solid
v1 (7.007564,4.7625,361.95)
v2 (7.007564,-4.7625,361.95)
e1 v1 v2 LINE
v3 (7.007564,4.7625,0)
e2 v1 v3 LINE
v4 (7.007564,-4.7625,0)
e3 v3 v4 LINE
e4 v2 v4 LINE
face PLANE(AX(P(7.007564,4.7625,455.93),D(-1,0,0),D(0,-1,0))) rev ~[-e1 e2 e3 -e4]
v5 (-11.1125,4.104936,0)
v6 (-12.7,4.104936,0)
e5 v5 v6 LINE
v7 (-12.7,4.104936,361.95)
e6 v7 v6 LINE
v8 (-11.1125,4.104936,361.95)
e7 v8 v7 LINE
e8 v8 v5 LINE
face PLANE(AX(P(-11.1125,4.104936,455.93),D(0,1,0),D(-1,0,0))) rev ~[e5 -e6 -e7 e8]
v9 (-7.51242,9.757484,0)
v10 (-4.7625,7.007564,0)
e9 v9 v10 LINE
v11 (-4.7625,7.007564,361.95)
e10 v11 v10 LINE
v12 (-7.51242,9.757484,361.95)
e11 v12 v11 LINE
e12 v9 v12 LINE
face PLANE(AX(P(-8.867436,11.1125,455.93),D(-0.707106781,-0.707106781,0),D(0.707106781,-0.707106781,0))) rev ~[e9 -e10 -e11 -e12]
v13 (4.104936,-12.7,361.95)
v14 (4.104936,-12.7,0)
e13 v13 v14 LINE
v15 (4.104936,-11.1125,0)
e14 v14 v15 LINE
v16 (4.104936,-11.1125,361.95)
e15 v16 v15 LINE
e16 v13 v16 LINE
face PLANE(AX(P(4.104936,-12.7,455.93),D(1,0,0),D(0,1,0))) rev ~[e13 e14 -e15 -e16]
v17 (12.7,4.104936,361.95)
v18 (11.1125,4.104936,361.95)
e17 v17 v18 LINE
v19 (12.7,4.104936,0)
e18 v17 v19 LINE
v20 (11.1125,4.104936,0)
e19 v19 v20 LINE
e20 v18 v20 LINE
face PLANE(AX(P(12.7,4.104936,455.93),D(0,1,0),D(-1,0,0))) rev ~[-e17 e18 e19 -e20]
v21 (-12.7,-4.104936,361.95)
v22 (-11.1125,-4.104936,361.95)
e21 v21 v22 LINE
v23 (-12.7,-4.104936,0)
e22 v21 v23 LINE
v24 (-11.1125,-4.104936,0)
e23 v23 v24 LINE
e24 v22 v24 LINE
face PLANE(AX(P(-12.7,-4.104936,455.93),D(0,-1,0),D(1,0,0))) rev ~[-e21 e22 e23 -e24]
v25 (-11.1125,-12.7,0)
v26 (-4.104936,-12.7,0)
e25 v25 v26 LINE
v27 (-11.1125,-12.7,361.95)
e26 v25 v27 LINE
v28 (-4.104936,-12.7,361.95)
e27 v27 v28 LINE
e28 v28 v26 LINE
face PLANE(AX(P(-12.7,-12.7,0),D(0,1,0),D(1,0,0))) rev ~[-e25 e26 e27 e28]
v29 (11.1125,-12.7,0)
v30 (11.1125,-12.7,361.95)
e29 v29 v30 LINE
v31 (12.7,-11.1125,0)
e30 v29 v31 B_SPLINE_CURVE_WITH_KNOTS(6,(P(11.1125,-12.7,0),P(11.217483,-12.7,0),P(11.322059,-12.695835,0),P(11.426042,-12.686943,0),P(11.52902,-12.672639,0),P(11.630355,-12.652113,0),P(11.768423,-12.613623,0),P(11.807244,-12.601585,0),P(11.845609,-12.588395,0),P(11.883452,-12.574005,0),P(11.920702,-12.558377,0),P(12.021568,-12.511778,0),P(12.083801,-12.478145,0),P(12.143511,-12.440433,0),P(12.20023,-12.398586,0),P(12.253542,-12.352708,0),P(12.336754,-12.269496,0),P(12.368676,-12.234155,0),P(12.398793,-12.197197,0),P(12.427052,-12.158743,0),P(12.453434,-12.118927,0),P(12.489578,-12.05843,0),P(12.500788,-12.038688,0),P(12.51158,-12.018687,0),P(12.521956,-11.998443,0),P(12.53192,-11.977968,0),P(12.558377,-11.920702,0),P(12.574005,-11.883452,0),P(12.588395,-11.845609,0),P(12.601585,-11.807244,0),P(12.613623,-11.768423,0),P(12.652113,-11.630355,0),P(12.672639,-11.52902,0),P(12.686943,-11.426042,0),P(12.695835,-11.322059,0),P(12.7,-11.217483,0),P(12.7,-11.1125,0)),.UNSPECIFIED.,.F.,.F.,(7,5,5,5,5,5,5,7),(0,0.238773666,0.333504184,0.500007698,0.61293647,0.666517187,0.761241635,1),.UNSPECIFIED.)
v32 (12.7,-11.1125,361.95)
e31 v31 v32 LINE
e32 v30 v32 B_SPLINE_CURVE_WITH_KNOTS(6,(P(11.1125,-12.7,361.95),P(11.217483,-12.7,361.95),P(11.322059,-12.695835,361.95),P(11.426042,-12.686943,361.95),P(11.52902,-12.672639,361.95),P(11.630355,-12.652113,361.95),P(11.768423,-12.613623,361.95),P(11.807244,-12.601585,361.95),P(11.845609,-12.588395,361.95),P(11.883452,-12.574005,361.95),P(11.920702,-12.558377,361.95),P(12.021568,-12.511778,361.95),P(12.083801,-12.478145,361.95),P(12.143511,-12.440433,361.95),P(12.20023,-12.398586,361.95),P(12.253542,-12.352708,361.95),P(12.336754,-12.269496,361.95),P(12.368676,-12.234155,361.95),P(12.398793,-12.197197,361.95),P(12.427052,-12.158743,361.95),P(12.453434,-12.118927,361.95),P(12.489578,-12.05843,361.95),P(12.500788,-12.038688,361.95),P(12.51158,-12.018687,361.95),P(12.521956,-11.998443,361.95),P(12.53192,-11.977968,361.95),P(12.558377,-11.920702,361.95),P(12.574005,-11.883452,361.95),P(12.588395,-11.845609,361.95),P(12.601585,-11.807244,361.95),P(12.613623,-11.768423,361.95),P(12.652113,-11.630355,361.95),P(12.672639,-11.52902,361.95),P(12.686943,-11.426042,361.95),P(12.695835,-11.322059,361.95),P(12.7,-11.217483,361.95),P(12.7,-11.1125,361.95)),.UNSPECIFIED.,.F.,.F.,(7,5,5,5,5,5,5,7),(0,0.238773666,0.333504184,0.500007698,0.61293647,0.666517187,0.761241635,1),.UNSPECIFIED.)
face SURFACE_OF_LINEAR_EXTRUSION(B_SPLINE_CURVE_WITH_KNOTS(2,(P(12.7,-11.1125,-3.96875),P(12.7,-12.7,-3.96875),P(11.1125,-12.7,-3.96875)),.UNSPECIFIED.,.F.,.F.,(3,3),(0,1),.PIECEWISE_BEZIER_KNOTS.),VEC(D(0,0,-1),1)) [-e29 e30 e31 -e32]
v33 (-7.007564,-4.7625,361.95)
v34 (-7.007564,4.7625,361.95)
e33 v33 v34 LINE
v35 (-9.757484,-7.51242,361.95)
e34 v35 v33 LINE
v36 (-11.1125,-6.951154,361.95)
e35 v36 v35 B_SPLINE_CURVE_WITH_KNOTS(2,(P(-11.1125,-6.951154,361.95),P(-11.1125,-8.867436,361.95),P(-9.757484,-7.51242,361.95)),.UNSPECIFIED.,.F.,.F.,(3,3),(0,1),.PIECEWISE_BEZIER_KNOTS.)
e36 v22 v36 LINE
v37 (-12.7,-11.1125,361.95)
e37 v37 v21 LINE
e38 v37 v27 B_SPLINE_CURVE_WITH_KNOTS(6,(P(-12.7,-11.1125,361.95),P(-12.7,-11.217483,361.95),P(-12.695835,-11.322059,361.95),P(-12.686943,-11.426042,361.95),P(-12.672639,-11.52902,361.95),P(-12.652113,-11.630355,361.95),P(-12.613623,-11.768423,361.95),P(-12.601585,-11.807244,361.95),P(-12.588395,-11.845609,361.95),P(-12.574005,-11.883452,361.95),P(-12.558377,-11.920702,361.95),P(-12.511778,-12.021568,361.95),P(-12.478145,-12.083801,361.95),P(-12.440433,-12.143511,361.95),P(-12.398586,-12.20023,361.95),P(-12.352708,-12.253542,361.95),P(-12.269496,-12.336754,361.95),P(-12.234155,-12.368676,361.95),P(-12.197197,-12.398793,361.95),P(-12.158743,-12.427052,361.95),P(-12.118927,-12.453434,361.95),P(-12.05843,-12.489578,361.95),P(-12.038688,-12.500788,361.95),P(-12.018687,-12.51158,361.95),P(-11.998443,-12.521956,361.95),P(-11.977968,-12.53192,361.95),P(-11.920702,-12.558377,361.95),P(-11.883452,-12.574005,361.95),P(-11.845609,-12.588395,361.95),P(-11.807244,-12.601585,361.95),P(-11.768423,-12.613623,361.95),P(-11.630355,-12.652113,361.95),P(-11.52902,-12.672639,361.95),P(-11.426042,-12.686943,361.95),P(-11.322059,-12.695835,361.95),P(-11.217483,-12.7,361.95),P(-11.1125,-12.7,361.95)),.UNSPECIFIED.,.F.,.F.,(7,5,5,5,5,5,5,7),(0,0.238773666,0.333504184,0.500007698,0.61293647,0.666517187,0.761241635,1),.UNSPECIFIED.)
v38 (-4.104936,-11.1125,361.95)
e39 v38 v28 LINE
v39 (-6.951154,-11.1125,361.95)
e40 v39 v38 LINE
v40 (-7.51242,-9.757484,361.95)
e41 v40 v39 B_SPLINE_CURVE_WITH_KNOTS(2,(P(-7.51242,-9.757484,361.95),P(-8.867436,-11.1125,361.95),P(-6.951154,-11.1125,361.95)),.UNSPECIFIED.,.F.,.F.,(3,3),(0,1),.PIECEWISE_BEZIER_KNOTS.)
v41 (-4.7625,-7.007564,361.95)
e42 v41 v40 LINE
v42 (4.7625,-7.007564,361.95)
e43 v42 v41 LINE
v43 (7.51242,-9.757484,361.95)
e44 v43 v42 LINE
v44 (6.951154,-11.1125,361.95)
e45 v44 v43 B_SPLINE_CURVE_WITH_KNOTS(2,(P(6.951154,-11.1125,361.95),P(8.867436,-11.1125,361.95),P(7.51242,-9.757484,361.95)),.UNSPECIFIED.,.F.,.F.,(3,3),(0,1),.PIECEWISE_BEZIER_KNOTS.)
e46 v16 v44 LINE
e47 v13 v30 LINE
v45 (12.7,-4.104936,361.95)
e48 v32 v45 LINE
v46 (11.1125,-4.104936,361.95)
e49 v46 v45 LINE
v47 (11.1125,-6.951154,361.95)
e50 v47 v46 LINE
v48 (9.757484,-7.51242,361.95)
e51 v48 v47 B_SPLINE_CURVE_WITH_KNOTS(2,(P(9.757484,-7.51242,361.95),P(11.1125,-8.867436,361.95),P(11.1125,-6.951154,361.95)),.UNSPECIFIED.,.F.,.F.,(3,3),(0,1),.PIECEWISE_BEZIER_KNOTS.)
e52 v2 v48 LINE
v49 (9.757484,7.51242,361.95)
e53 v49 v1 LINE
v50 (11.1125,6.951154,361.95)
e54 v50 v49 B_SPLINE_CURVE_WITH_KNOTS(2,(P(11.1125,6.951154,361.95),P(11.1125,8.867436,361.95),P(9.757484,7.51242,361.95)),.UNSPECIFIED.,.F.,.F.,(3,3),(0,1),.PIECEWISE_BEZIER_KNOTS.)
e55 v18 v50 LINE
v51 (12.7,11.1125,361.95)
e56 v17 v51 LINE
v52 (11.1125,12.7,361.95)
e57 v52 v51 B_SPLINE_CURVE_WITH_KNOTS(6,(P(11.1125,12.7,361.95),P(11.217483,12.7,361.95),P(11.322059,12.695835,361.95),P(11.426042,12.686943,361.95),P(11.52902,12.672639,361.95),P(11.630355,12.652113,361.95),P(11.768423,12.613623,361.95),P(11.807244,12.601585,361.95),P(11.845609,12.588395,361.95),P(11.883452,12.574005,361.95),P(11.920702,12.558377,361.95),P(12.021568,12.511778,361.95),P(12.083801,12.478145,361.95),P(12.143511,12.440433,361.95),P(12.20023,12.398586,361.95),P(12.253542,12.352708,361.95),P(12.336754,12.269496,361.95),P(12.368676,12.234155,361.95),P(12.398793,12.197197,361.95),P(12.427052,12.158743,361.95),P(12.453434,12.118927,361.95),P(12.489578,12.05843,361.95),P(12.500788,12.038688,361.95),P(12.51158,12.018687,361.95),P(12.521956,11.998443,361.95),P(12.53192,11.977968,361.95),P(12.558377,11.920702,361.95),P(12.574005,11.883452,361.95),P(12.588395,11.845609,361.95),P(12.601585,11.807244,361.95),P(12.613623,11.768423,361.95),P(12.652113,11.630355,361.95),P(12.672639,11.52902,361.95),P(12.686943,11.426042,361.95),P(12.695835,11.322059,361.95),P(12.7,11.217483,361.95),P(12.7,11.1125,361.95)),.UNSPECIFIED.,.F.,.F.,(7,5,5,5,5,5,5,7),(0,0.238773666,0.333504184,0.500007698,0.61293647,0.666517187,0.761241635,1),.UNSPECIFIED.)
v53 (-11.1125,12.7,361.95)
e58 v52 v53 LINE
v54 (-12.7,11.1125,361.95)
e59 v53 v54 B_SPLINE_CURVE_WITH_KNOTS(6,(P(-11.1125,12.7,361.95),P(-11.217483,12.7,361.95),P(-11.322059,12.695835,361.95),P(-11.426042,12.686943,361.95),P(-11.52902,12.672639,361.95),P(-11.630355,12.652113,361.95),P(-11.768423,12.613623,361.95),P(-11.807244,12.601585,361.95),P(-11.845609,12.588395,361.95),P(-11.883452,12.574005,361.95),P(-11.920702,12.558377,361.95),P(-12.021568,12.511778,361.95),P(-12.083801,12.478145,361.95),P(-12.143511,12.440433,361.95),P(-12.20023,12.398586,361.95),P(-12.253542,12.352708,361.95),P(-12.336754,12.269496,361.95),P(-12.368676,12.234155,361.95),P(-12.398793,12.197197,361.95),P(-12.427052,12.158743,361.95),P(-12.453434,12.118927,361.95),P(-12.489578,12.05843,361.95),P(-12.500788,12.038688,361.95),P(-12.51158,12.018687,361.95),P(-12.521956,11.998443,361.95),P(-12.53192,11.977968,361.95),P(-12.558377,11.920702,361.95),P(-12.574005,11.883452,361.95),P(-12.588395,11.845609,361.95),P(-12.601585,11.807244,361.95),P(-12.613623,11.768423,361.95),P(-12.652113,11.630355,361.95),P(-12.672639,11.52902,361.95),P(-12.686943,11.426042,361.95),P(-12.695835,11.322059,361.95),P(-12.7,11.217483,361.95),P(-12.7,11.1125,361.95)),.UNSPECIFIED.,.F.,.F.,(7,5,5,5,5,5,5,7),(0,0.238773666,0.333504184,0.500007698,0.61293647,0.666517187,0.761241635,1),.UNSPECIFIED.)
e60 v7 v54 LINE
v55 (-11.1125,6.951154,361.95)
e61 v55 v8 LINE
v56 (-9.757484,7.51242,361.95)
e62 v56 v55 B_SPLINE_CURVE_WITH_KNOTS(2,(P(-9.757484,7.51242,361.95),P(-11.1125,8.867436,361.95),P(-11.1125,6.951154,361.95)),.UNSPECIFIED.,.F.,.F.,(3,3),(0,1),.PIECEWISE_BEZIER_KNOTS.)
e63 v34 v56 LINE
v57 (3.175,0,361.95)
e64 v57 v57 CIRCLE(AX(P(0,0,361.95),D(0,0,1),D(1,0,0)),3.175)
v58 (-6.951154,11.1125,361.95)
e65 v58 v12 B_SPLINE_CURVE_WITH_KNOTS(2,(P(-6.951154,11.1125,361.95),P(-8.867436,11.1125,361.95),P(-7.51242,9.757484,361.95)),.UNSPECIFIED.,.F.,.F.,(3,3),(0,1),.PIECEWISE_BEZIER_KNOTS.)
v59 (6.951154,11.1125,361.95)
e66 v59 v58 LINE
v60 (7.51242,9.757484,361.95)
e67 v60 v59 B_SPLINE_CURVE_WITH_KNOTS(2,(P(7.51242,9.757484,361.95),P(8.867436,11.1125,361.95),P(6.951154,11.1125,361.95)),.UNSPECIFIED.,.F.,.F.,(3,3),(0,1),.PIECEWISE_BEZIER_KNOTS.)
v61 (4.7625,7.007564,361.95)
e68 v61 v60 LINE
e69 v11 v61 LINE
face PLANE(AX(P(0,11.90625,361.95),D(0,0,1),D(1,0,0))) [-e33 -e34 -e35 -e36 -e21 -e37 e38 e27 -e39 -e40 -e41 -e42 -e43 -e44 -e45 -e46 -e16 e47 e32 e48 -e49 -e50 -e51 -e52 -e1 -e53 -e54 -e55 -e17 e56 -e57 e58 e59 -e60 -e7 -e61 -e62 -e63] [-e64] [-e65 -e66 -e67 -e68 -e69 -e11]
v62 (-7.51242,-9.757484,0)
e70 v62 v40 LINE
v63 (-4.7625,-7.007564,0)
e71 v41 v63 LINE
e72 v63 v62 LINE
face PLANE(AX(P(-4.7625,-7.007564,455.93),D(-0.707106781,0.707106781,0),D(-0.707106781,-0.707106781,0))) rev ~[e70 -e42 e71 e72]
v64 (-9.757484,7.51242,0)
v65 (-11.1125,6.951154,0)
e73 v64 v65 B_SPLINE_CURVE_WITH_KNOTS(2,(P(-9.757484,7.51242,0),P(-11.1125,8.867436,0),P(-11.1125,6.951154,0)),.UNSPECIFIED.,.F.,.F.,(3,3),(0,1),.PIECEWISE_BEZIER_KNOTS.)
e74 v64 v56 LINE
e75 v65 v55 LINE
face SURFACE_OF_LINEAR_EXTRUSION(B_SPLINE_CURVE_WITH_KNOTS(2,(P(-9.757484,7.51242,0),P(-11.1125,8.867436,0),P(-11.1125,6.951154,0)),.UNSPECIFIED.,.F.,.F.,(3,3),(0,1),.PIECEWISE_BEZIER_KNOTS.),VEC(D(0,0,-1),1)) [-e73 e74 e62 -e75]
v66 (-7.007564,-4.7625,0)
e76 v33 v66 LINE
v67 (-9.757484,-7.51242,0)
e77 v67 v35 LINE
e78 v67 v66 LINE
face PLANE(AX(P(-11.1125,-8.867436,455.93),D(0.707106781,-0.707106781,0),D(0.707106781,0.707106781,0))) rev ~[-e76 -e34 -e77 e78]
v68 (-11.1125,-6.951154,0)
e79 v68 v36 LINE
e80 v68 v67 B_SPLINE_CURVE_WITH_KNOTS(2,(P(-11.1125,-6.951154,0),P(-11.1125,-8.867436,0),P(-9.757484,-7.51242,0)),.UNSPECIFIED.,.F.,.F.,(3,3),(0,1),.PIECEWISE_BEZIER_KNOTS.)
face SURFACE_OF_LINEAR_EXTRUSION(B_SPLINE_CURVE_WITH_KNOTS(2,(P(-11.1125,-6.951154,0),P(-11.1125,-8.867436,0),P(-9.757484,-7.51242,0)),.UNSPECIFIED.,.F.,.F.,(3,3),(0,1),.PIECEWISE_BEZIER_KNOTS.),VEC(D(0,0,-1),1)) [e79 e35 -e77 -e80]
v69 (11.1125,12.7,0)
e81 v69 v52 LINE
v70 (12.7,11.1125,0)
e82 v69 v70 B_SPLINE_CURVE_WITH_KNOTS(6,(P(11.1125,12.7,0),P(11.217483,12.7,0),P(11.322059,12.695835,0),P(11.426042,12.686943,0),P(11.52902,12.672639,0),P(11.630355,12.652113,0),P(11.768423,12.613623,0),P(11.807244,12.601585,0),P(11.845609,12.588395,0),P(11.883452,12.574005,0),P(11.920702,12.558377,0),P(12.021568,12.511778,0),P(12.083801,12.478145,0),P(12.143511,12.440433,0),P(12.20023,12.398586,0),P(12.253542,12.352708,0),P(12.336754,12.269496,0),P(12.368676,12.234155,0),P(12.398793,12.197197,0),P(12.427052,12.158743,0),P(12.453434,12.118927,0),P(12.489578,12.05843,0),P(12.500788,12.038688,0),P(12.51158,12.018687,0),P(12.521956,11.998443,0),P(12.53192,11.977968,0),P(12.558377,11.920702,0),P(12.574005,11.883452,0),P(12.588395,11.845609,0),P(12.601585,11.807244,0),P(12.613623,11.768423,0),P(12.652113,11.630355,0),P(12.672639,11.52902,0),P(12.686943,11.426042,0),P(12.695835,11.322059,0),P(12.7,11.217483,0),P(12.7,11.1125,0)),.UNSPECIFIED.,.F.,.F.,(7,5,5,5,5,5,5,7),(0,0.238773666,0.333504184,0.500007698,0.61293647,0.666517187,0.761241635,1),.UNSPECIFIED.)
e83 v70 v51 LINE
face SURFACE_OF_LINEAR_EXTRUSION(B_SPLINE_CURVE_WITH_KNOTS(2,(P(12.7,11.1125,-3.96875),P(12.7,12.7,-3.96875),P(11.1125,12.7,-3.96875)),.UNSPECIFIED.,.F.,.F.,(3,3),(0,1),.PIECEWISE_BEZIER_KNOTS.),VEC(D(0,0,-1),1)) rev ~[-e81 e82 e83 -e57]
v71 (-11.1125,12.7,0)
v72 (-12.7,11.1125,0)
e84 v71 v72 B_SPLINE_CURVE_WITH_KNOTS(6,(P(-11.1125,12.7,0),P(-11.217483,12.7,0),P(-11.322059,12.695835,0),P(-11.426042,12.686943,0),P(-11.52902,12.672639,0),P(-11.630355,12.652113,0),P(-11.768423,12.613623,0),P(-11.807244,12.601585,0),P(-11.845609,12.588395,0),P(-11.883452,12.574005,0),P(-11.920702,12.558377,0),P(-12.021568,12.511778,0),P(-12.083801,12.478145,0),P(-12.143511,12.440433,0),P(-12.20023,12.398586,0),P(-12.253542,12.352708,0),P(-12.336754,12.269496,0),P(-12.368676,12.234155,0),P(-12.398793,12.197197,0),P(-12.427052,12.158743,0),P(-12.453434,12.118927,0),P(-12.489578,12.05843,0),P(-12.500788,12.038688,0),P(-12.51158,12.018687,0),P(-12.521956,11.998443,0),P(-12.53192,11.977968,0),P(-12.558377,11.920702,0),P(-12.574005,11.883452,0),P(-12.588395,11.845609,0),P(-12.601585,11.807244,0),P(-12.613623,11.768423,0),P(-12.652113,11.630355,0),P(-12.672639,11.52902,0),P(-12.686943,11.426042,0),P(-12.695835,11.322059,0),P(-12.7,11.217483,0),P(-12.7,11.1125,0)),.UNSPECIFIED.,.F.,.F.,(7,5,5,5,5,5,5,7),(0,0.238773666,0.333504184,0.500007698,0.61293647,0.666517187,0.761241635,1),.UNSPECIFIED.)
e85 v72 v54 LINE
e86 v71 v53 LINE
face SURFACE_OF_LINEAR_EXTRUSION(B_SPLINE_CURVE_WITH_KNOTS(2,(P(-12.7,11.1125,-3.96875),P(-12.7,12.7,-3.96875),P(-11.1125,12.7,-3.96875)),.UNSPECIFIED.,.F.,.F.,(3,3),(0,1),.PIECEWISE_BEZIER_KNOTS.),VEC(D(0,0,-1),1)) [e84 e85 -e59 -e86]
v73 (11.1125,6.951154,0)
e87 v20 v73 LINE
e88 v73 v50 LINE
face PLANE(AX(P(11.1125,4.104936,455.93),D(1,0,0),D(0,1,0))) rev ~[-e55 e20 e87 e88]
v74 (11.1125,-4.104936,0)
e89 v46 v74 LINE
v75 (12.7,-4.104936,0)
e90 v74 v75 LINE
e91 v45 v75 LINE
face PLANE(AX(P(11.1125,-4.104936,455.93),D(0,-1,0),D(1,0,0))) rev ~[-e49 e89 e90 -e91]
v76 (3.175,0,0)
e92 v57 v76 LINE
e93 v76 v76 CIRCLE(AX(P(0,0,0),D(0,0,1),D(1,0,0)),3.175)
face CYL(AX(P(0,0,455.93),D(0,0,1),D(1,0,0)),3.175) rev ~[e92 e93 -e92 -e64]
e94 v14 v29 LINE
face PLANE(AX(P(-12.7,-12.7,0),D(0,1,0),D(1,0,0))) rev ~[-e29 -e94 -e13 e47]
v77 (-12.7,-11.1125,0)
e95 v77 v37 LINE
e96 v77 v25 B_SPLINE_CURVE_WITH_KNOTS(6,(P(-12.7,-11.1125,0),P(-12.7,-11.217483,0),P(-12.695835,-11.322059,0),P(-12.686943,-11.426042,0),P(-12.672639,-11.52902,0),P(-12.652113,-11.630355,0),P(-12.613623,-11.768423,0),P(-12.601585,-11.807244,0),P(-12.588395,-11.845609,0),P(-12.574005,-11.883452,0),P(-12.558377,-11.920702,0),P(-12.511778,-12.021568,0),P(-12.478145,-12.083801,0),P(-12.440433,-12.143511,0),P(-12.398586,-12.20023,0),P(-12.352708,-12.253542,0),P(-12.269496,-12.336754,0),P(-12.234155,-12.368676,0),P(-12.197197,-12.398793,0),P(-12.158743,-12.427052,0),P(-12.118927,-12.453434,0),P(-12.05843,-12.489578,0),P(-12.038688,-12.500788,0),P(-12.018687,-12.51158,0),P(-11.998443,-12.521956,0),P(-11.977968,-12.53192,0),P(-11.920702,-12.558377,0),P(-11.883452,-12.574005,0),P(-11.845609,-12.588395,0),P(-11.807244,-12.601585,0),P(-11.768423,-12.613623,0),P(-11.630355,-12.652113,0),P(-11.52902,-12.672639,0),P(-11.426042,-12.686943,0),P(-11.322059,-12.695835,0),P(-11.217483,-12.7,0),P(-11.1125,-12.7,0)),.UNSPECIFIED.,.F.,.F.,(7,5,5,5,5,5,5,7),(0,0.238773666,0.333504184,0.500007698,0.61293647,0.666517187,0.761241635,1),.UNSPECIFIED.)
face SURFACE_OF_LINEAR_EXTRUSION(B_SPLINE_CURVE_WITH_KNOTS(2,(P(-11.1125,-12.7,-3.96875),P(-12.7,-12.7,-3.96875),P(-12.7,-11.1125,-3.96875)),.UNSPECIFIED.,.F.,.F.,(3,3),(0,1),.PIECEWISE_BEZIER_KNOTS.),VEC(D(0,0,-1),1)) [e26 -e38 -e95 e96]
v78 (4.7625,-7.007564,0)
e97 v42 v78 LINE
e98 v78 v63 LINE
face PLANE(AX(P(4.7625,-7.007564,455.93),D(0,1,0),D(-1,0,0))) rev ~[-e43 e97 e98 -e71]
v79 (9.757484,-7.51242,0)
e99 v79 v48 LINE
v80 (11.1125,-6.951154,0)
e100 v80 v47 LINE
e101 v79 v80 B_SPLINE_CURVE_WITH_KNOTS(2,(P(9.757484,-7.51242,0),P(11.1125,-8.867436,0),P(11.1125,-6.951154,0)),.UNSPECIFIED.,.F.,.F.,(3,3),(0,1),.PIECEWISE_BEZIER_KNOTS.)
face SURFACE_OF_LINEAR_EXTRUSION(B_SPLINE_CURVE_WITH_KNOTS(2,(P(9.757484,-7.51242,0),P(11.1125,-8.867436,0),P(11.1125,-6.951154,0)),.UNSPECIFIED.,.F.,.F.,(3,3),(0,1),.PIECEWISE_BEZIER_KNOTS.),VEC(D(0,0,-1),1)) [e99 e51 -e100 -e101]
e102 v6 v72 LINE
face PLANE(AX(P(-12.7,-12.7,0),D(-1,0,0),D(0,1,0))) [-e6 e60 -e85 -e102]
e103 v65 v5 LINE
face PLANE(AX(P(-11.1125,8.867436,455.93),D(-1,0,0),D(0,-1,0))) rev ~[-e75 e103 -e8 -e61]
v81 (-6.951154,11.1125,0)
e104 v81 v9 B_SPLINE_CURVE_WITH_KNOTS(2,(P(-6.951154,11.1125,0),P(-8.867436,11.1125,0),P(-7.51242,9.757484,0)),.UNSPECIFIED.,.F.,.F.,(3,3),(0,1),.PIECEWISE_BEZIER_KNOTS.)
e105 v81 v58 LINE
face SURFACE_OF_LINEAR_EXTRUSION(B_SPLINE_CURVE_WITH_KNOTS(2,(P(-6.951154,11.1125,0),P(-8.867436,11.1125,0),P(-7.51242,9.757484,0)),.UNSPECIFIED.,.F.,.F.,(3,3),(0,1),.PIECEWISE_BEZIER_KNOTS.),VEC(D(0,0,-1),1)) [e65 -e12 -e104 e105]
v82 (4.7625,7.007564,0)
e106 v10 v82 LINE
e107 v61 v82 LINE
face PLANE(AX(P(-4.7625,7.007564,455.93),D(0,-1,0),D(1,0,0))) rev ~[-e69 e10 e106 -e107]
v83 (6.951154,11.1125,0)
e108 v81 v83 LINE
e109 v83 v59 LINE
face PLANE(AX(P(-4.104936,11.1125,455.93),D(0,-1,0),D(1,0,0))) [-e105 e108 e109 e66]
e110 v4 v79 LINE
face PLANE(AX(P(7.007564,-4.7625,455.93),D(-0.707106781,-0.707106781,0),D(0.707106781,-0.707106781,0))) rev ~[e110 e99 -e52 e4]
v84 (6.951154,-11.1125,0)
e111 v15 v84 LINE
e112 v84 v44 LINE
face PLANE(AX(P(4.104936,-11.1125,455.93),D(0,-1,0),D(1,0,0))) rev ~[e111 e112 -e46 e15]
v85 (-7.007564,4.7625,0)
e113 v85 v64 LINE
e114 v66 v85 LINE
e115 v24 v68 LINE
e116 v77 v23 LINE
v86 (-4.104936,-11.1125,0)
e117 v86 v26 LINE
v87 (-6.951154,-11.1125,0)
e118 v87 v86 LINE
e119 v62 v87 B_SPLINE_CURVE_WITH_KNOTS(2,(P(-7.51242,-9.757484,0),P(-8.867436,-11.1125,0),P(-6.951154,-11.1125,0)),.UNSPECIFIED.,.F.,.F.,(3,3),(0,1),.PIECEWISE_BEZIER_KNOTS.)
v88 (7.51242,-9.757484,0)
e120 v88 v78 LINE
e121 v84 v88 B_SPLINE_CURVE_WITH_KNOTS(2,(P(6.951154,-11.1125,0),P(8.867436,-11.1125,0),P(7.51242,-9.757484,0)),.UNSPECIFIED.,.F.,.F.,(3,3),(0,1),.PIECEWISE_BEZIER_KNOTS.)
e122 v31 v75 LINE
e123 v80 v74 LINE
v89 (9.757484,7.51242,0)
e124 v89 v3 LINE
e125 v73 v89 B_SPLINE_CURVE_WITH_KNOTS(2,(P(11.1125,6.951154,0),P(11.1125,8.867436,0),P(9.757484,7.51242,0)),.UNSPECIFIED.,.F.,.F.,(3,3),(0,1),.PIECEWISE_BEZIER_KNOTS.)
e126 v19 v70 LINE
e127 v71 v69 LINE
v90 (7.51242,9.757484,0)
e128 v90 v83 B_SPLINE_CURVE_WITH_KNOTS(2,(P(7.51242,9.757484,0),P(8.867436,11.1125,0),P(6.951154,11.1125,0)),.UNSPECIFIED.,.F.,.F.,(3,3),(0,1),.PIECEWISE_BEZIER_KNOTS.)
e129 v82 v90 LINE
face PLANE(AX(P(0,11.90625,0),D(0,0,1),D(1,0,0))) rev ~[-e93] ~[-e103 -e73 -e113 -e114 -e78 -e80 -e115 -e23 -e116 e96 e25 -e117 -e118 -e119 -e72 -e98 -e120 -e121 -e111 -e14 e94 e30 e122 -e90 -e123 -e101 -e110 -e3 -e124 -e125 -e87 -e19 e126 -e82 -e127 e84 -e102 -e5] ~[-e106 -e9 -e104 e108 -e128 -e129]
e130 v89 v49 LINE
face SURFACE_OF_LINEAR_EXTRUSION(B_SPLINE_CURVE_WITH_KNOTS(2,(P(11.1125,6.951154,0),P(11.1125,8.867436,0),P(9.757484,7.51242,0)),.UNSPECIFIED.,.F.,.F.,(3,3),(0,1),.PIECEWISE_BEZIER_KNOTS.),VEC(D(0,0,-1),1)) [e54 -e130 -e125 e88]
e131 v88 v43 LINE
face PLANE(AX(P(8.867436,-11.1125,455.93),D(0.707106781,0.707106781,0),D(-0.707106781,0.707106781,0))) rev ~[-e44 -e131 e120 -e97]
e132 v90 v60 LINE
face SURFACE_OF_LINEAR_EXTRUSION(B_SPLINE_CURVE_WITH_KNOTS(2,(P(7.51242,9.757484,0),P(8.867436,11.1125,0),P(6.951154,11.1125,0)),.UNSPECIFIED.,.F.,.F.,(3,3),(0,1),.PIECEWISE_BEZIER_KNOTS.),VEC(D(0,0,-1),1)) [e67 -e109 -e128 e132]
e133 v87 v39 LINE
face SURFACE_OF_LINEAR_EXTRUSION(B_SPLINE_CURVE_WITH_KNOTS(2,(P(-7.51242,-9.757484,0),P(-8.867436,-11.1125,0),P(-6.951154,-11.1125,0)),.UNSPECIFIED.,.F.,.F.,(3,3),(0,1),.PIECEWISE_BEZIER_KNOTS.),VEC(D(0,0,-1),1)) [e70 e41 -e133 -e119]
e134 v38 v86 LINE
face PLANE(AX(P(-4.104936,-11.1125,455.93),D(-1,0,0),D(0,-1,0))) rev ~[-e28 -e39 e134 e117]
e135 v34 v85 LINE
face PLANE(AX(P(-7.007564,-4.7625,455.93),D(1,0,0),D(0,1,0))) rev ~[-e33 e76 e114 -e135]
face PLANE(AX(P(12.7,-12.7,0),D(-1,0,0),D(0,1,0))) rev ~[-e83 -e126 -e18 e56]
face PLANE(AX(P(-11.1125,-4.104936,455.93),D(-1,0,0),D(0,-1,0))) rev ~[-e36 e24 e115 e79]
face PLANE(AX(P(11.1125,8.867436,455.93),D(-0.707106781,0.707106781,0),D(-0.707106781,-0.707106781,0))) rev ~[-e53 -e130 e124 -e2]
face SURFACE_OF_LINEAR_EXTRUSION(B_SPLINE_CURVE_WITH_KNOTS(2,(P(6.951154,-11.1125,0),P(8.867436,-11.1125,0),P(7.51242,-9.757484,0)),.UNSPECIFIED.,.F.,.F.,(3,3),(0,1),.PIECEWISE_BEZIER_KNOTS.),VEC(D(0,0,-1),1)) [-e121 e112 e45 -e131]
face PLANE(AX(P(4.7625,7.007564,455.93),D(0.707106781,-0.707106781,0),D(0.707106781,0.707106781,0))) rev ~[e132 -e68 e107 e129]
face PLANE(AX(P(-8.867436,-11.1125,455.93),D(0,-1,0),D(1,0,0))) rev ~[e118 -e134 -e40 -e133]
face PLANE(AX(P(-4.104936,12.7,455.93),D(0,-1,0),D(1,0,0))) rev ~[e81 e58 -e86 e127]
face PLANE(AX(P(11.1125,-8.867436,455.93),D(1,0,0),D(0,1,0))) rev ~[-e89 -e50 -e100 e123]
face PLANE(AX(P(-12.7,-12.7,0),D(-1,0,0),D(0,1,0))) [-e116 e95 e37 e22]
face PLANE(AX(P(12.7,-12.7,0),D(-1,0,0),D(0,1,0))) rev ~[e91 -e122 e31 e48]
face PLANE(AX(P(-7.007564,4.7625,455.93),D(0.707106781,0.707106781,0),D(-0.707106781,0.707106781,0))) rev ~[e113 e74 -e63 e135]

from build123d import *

# Parameters (mm, degrees)
F0_W        = 25.4
F0_H        = 25.4
F1_DEPTH    = 455.93
F3_DEPTH    = 455.93
F4_R        = 3.175
F5_DEPTH    = 455.93
F6_T1_DEPTH = 463.8675
F7_T1_DEPTH = 455.93
F8_W        = 8.2098719395
F8_H        = 1.5875
F9_DEPTH    = 455.93
F10_DEPTH   = 93.98


# Not quite as in the source:
# - a fillet or chamfer that OpenCascade refuses, or shapes differently, is made with other operations: its cross-section is extruded or revolved along the edge and cut away or added


with BuildPart() as f1:
    # F0 (on Top) → F1 (new body)
    with BuildSketch(Plane.XY):
        Rectangle(F0_W, F0_H)
    extrude(amount=F1_DEPTH)

    # F2 (on face) → F3 (cut)
    with BuildSketch(Plane.XY.offset(455.93)):
        Polygon((-7.0075640303, -4.7625), (-7.0075640303, 4.7625), (-11.1125, 8.8674359697), (-11.1125, 4.1049359697), (-12.7, 4.1049359697), (-12.7, -4.1049359697), (-11.1125, -4.1049359697), (-11.1125, -8.8674359697), align=None)
        Polygon((4.1049359697, 12.7), (-4.1049359697, 12.7), (-4.1049359697, 11.1125), (-8.8674359697, 11.1125), (-4.7625, 7.0075640303), (4.7625, 7.0075640303), (8.8674359697, 11.1125), (4.1049359697, 11.1125), align=None)
        Polygon((12.7, -4.1049359697), (12.7, 4.1049359697), (11.1125, 4.1049359697), (11.1125, 8.8674359697), (7.0075640303, 4.7625), (7.0075640303, -4.7625), (11.1125, -8.8674359697), (11.1125, -4.1049359697), align=None)
        Polygon((-4.1049359697, -11.1125), (-4.1049359697, -12.7), (4.1049359697, -12.7), (4.1049359697, -11.1125), (8.8674359697, -11.1125), (4.7625, -7.0075640303), (-4.7625, -7.0075640303), (-8.8674359697, -11.1125), align=None)
    extrude(amount=-F3_DEPTH, mode=Mode.SUBTRACT)

    # F4 (on face) → F5 (cut)
    with BuildSketch(Plane.XY.offset(455.93)):
        Circle(F4_R)
    extrude(amount=-F5_DEPTH, mode=Mode.SUBTRACT)

    # F6: fillet of radius 1.5875 on 4 edges, made by hand

    # F6_s2 → F6_t1 (cut)
    with BuildSketch(Plane.XY.offset(-3.96875)):
        with BuildLine():
            add(Edge.make_bspline(
                [(-12.7, 11.1125), (-12.7, 12.7), (-11.1125, 12.7)],
                knots=[0, 0, 0, 1, 1, 1], degree=2, weights=[1, 1, 1]))
            Line((-11.1125, 12.7), (-12.7, 12.7))
            Line((-12.7, 12.7), (-12.7, 11.1125))
        make_face()
        with BuildLine():
            add(Edge.make_bspline(
                [(12.7, 11.1125), (12.7, 12.7), (11.1125, 12.7)],
                knots=[0, 0, 0, 1, 1, 1], degree=2, weights=[1, 1, 1]))
            Line((11.1125, 12.7), (12.7, 12.7))
            Line((12.7, 12.7), (12.7, 11.1125))
        make_face()
        with BuildLine():
            add(Edge.make_bspline(
                [(12.7, -11.1125), (12.7, -12.7), (11.1125, -12.7)],
                knots=[0, 0, 0, 1, 1, 1], degree=2, weights=[1, 1, 1]))
            Line((11.1125, -12.7), (12.7, -12.7))
            Line((12.7, -12.7), (12.7, -11.1125))
        make_face()
        with BuildLine():
            add(Edge.make_bspline(
                [(-11.1125, -12.7), (-12.7, -12.7), (-12.7, -11.1125)],
                knots=[0, 0, 0, 1, 1, 1], degree=2, weights=[1, 1, 1]))
            Line((-12.7, -11.1125), (-12.7, -12.7))
            Line((-12.7, -12.7), (-11.1125, -12.7))
        make_face()
    extrude(amount=F6_T1_DEPTH, mode=Mode.SUBTRACT)

    # F7: fillet of radius 0.79375 on 8 edges, made by hand

    # F7_s2 → F7_t1 (join)
    with BuildSketch(Plane.XY):
        with BuildLine():
            add(Edge.make_bspline(
                [(-9.7574839924, 7.5124199622), (-11.1125, 8.8674359697), (-11.1125, 6.9511539546)],
                knots=[0, 0, 0, 1, 1, 1], degree=2, weights=[1, 1, 1]))
            Line((-11.1125, 6.9511539546), (-11.1125, 8.8674359697))
            Line((-11.1125, 8.8674359697), (-9.7574839924, 7.5124199622))
        make_face()
        with BuildLine():
            add(Edge.make_bspline(
                [(11.1125, 6.9511539546), (11.1125, 8.8674359697), (9.7574839924, 7.5124199622)],
                knots=[0, 0, 0, 1, 1, 1], degree=2, weights=[1, 1, 1]))
            Line((9.7574839924, 7.5124199622), (11.1125, 8.8674359697))
            Line((11.1125, 8.8674359697), (11.1125, 6.9511539546))
        make_face()
        with BuildLine():
            add(Edge.make_bspline(
                [(9.7574839924, -7.5124199622), (11.1125, -8.8674359697), (11.1125, -6.9511539546)],
                knots=[0, 0, 0, 1, 1, 1], degree=2, weights=[1, 1, 1]))
            Line((11.1125, -6.9511539546), (11.1125, -8.8674359697))
            Line((11.1125, -8.8674359697), (9.7574839924, -7.5124199622))
        make_face()
        with BuildLine():
            add(Edge.make_bspline(
                [(-11.1125, -6.9511539546), (-11.1125, -8.8674359697), (-9.7574839924, -7.5124199622)],
                knots=[0, 0, 0, 1, 1, 1], degree=2, weights=[1, 1, 1]))
            Line((-9.7574839924, -7.5124199622), (-11.1125, -8.8674359697))
            Line((-11.1125, -8.8674359697), (-11.1125, -6.9511539546))
        make_face()
        with BuildLine():
            add(Edge.make_bspline(
                [(-7.5124199622, -9.7574839924), (-8.8674359697, -11.1125), (-6.9511539546, -11.1125)],
                knots=[0, 0, 0, 1, 1, 1], degree=2, weights=[1, 1, 1]))
            Line((-6.9511539546, -11.1125), (-8.8674359697, -11.1125))
            Line((-8.8674359697, -11.1125), (-7.5124199622, -9.7574839924))
        make_face()
        with BuildLine():
            add(Edge.make_bspline(
                [(6.9511539546, -11.1125), (8.8674359697, -11.1125), (7.5124199622, -9.7574839924)],
                knots=[0, 0, 0, 1, 1, 1], degree=2, weights=[1, 1, 1]))
            Line((7.5124199622, -9.7574839924), (8.8674359697, -11.1125))
            Line((8.8674359697, -11.1125), (6.9511539546, -11.1125))
        make_face()
        with BuildLine():
            add(Edge.make_bspline(
                [(7.5124199622, 9.7574839924), (8.8674359697, 11.1125), (6.9511539546, 11.1125)],
                knots=[0, 0, 0, 1, 1, 1], degree=2, weights=[1, 1, 1]))
            Line((6.9511539546, 11.1125), (8.8674359697, 11.1125))
            Line((8.8674359697, 11.1125), (7.5124199622, 9.7574839924))
        make_face()
        with BuildLine():
            add(Edge.make_bspline(
                [(-6.9511539546, 11.1125), (-8.8674359697, 11.1125), (-7.5124199622, 9.7574839924)],
                knots=[0, 0, 0, 1, 1, 1], degree=2, weights=[1, 1, 1]))
            Line((-7.5124199622, 9.7574839924), (-8.8674359697, 11.1125))
            Line((-8.8674359697, 11.1125), (-6.9511539546, 11.1125))
        make_face()
    extrude(amount=F7_T1_DEPTH)

    # F8 (on face) → F9 (join)
    with BuildSketch(Plane.XY.offset(455.93)):
        with Locations((0, 11.90625)):
            Rectangle(F8_W, F8_H)
    extrude(amount=-F9_DEPTH)

    # F10 (cut): a face of the model
    f10_faces = [f1.faces().sort_by_distance(p)[0] for p in [
        (4.4641462174, -11.90625, 455.93),
    ]]
    extrude(f10_faces, amount=-F10_DEPTH, mode=Mode.SUBTRACT)


solid = f1.part
